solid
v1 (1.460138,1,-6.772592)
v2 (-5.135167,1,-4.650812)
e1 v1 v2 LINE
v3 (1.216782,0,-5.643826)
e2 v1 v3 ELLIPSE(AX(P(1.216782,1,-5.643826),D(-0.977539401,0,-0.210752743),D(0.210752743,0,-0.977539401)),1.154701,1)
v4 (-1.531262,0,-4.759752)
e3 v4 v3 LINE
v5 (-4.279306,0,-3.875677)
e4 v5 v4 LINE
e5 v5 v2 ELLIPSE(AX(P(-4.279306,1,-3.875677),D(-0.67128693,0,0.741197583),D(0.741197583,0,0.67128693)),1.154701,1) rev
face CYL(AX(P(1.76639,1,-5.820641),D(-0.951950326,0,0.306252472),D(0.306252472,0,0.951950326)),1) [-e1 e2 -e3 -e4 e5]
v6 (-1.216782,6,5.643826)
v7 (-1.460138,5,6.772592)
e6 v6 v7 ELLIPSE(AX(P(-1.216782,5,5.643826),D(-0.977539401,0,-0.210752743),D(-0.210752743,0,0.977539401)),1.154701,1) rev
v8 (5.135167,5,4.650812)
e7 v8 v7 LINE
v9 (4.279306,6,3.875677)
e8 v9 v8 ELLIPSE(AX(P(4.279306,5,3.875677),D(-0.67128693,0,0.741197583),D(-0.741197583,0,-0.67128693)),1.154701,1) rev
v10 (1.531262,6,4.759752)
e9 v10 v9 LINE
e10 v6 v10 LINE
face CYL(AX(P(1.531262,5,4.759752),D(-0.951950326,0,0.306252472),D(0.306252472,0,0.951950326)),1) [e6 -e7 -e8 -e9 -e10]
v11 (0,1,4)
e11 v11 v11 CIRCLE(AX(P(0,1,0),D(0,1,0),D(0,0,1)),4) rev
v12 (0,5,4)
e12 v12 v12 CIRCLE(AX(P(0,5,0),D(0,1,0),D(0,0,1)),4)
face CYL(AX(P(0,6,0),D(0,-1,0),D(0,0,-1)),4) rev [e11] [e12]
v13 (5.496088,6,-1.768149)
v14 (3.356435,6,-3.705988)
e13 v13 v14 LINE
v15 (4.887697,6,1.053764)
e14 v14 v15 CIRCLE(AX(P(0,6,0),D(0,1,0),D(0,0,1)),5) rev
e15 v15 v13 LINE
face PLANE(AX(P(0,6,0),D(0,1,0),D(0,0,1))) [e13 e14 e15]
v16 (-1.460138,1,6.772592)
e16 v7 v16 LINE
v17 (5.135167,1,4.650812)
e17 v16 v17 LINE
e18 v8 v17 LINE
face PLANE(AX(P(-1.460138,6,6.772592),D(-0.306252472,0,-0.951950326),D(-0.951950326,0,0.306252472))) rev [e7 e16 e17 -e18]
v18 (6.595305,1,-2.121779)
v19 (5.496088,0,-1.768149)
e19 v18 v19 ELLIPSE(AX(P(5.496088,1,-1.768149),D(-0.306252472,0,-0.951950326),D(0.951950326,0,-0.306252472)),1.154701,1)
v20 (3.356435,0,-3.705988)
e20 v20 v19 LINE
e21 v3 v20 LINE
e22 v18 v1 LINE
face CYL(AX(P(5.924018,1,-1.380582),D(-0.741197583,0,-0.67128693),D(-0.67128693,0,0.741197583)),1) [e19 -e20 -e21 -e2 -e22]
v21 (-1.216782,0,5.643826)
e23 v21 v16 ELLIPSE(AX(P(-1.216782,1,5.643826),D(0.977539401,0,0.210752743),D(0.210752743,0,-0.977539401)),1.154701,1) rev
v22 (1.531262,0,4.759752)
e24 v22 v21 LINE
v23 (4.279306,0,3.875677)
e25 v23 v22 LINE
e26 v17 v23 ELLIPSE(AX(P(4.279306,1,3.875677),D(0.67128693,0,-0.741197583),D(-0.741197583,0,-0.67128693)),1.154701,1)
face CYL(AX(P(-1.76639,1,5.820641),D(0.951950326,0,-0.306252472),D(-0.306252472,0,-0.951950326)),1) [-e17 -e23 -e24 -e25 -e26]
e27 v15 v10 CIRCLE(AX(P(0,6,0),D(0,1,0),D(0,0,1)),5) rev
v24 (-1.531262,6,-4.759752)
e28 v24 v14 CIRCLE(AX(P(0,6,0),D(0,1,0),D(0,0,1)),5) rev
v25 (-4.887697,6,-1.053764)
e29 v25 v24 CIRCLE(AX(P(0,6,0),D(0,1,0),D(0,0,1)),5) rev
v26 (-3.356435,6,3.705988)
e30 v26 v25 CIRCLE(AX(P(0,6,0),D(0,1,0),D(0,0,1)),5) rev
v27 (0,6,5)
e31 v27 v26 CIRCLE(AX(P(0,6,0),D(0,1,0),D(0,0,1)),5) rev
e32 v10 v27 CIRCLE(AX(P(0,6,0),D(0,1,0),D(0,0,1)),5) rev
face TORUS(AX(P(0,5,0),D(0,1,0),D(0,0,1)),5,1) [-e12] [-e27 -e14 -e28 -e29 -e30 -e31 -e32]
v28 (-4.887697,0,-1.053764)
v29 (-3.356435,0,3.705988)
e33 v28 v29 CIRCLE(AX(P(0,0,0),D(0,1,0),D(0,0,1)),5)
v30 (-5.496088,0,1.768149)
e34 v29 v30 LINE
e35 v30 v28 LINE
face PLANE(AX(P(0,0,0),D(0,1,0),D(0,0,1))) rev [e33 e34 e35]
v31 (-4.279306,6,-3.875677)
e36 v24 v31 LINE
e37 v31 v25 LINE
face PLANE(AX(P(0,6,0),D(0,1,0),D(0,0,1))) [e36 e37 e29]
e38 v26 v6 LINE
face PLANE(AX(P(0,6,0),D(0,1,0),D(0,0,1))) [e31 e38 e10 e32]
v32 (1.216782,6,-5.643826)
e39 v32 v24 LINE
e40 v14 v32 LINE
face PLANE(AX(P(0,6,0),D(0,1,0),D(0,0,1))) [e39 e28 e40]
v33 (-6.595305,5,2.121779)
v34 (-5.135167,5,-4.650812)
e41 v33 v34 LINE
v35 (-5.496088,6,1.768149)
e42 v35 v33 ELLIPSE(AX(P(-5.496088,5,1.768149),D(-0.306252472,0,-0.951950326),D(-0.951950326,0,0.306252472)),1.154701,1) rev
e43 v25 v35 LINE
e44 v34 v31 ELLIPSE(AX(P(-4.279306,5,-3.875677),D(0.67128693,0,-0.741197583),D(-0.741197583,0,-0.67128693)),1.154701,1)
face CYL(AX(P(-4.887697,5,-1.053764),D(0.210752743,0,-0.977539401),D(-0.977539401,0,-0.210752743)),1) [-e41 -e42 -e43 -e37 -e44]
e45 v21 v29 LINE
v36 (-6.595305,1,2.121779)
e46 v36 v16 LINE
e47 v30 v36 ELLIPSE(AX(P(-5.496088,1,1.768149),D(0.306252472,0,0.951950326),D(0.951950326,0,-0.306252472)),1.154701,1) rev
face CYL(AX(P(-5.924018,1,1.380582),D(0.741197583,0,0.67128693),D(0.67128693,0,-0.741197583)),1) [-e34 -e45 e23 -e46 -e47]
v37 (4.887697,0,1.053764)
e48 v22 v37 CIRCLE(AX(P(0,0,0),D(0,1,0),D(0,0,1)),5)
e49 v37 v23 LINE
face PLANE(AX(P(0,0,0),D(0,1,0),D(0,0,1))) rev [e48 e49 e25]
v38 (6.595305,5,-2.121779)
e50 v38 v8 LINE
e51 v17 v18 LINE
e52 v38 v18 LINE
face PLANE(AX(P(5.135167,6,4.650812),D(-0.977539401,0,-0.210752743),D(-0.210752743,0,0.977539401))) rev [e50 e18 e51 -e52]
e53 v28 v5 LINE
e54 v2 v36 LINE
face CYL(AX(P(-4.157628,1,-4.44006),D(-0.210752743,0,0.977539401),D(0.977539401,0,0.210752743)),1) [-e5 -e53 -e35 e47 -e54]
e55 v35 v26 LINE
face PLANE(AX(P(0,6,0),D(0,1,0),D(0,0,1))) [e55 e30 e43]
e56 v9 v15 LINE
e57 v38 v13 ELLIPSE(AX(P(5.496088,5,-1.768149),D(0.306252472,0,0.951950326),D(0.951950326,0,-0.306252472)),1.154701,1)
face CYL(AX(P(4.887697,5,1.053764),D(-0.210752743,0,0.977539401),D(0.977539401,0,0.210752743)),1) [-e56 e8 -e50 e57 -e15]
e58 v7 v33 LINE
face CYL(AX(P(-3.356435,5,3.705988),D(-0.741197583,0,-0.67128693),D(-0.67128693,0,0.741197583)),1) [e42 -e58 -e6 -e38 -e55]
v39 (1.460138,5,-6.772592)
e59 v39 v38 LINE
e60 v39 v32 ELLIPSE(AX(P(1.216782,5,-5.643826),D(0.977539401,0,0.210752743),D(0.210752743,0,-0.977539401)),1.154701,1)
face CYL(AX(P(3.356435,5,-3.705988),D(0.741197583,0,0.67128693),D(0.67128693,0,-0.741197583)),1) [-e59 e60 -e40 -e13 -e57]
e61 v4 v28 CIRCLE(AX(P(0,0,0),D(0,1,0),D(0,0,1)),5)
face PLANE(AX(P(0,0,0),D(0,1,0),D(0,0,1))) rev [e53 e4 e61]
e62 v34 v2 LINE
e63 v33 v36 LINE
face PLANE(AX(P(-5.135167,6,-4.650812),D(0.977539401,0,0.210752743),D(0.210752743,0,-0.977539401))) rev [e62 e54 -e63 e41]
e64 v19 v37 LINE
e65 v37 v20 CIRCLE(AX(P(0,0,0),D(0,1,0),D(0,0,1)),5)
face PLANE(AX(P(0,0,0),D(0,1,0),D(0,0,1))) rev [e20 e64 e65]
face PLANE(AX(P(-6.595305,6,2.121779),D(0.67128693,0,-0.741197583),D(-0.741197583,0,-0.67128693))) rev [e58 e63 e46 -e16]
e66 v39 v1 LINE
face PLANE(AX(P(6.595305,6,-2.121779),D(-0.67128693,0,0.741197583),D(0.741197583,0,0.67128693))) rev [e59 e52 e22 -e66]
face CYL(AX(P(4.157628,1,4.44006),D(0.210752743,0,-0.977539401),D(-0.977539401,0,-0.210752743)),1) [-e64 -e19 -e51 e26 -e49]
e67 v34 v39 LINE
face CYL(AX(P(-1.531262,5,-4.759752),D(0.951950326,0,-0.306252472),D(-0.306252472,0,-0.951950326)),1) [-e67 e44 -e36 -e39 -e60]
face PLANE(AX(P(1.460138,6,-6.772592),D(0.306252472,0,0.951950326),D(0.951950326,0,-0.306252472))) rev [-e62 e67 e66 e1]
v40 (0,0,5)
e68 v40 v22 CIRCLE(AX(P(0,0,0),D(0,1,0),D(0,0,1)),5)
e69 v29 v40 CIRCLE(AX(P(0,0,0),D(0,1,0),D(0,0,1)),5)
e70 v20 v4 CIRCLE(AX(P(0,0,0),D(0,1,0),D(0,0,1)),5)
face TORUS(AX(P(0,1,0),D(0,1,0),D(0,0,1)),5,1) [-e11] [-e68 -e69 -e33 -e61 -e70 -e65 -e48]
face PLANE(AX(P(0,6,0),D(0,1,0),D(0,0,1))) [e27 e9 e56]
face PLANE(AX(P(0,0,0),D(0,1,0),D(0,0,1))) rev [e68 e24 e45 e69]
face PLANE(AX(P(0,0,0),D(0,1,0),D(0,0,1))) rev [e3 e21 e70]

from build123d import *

# Parameters (mm, degrees)
SKETCH1_R           = 4
BOSS_EXTRUDE1_DEPTH = 6
FILLET1_R           = 1


with BuildPart() as part:
    # Sketch1 → Boss-Extrude1 (new body)
    with BuildSketch(Plane(origin=(0, 0, 0), x_dir=(1, 0, 0), z_dir=(0, 1, 0))):
        Polygon((-5.135167492, 4.650812276), (-6.595305325, -2.121779363), (-1.460137834, -6.772591639), (5.135167492, -4.650812276), (6.595305325, 2.121779363), (1.460137834, 6.772591639), align=None)
        with Locations(Location((0, 0, 0), (0, 0, 270))):
            Circle(SKETCH1_R, mode=Mode.SUBTRACT)
    extrude(amount=BOSS_EXTRUDE1_DEPTH)

    # Fillet1
    fillet1_edges = [part.edges().sort_by_distance(p)[0] for p in [
        (-4.02772158, 6, 4.447185501),
        (1.837514829, 6, 5.711701958),
        (5.865236409, 6, 1.264516457),
        (0, 0, -4),
        (0, 6, -4),
        (4.02772158, 6, -4.447185501),
        (-1.837514829, 6, -5.711701958),
        (4.02772158, 0, -4.447185501),
        (5.865236409, 0, 1.264516457),
        (1.837514829, 0, 5.711701958),
        (-5.865236409, 6, -1.264516457),
        (-4.02772158, 0, 4.447185501),
        (-5.865236409, 0, -1.264516457),
        (-1.837514829, 0, -5.711701958),
    ]]
    fillet(fillet1_edges, radius=FILLET1_R - 0.0001)  # a hair under: the kernel refuses the full size


solid = part.part
